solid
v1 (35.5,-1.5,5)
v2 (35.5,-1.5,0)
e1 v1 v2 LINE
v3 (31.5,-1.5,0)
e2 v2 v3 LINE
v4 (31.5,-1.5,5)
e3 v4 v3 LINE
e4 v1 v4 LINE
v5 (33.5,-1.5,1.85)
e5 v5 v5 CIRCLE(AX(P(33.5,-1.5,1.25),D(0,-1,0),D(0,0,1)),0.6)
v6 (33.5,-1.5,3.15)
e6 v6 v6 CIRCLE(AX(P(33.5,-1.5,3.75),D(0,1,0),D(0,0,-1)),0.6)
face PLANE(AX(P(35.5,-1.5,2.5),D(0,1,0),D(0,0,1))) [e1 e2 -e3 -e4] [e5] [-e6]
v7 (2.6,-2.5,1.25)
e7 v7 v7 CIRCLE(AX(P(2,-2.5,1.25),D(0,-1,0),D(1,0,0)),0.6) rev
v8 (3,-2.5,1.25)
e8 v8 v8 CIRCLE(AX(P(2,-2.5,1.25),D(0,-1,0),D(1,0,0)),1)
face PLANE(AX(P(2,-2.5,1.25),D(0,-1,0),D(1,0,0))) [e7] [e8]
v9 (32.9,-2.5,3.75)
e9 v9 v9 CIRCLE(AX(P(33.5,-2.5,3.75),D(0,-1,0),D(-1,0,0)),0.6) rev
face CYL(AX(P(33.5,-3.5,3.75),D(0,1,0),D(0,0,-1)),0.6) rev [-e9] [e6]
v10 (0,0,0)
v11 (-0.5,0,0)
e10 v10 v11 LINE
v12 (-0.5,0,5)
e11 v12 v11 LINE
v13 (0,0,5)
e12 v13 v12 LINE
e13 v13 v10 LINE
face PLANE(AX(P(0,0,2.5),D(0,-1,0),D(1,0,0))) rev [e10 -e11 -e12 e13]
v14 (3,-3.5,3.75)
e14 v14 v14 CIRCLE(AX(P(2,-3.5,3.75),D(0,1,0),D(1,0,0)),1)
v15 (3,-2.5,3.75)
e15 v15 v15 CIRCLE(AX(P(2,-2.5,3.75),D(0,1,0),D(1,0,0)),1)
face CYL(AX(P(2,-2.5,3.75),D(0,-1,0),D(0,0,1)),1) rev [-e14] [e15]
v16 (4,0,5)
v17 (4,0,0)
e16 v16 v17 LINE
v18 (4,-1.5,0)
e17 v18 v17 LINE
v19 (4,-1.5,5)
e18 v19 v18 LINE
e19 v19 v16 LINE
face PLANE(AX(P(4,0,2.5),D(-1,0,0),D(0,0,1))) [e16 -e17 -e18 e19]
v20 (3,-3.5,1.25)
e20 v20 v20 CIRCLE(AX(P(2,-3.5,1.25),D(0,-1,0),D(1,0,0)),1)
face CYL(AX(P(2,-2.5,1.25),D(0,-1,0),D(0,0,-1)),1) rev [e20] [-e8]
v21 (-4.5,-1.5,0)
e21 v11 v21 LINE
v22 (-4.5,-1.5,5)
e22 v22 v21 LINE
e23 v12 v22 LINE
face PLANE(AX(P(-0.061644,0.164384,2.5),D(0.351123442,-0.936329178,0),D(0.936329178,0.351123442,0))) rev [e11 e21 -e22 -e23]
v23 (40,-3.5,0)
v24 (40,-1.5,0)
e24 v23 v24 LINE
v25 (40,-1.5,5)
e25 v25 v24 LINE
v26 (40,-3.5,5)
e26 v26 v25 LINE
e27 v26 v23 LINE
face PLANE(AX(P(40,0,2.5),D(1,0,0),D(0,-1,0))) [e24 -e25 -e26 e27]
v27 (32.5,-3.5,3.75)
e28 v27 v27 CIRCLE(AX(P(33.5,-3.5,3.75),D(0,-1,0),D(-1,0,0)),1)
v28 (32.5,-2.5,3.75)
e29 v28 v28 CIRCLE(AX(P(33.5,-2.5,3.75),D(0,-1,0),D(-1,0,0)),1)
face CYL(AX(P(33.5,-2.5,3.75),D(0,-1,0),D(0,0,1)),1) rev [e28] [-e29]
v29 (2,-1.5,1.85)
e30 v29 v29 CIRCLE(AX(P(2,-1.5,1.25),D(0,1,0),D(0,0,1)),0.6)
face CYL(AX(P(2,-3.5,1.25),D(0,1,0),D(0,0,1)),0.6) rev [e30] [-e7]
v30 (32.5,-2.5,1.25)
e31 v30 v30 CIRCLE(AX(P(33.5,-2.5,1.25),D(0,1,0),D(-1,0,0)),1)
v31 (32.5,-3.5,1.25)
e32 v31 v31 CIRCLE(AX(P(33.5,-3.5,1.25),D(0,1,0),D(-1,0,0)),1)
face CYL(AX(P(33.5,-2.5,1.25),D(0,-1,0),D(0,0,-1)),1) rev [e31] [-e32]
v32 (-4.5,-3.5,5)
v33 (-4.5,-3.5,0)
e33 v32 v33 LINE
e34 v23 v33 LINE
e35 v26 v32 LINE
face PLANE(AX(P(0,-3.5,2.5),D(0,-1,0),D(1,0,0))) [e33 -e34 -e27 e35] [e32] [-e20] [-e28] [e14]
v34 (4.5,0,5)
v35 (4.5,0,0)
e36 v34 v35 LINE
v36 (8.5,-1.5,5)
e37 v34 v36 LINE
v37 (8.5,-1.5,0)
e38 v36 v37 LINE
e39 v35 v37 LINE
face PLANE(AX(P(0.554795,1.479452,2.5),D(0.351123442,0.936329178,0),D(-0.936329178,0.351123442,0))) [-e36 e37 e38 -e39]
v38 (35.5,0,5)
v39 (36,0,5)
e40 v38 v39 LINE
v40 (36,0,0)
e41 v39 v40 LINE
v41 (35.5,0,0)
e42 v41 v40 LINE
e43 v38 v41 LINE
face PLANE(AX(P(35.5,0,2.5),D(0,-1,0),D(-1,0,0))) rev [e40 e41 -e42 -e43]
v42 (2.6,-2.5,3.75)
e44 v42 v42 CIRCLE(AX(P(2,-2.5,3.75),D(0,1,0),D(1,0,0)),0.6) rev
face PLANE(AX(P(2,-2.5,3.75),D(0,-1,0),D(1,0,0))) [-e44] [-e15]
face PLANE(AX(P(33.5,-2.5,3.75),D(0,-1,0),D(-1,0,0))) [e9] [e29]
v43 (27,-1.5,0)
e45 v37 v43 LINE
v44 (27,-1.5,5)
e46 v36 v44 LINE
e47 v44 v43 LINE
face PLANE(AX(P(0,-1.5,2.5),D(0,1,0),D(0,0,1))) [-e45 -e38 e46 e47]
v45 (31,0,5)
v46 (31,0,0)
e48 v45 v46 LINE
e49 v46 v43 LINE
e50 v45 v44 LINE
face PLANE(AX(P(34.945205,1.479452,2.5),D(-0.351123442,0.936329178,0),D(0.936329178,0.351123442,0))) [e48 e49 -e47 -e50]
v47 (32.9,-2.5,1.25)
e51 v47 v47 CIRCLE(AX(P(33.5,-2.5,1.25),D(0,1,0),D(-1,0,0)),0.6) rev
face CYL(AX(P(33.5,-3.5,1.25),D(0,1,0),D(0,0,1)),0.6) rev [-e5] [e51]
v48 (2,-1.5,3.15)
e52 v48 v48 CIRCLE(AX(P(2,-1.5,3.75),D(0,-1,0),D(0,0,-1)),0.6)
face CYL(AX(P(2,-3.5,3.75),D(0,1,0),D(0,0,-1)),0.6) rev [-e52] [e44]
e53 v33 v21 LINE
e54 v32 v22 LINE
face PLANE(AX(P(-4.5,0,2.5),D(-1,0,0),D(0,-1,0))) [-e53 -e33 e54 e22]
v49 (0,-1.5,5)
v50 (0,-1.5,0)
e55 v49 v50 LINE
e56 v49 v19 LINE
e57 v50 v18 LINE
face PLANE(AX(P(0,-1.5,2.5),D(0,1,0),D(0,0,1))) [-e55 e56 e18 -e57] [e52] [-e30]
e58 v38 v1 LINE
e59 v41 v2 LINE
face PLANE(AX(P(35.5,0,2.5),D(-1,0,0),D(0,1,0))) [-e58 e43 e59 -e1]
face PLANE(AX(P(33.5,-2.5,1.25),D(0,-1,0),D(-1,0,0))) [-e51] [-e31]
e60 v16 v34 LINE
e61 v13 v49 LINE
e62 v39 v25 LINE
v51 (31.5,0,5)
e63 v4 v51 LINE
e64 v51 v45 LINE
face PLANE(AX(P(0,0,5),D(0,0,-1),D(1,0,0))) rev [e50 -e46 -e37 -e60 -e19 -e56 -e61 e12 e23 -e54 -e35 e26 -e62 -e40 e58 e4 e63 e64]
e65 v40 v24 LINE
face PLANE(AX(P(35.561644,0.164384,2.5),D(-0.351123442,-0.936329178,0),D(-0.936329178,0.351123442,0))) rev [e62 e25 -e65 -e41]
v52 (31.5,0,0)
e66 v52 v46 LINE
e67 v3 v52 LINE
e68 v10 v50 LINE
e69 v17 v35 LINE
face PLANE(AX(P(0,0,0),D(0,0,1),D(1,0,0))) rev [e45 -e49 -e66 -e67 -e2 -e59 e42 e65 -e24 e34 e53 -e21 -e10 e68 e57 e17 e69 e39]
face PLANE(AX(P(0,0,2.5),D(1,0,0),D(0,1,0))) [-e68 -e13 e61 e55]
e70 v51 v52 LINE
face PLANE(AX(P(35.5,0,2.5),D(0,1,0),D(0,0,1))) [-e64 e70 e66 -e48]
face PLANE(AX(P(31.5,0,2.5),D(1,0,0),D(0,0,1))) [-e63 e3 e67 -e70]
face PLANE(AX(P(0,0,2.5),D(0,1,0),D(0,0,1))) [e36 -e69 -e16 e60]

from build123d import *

# Parameters (mm, degrees)
EXTRUDE_1_DEPTH     = 2.5
SKETCH_5_R          = 0.6
CUT_EXTRUDE_1_DEPTH = 19.036421485
CUT_EXTRUDE_START   = -2
SKETCH_5_3_R        = 1
CUT_EXTRUDE_2_DEPTH = 1


with BuildPart() as part:
    # 草图4 → 凸台-拉伸1 (new body)
    with BuildSketch(Plane.XY):
        Polygon((8.5, -1.5), (17.75, -1.5), (17.75, -3.5), (-4.5, -3.5), (-4.5, -1.5), (-0.5, 0), (0, 0), (0, -1.5), (4, -1.5), (4, 0), (4.5, 0), align=None)
    extrude(amount=EXTRUDE_1_DEPTH)

    # 草图5 → 切除-拉伸1 (cut, through all)
    with BuildSketch(Plane(origin=(0, -1.5, 0), x_dir=(1, 0, 0), z_dir=(0, 1, 0))):
        with Locations(Location((2, -1.25, 0), (0, 0, 270))):
            Circle(SKETCH_5_R)
    extrude(amount=-CUT_EXTRUDE_1_DEPTH, mode=Mode.SUBTRACT)

    # 草图5<3> → 切除-拉伸2 (cut)
    with BuildSketch(Plane(origin=(0, -1.5, 0), x_dir=(1, 0, 0), z_dir=(0, 1, 0)).offset(CUT_EXTRUDE_START)):
        with Locations((2, -1.25)):
            Circle(SKETCH_5_3_R)
    extrude(amount=CUT_EXTRUDE_2_DEPTH, mode=Mode.SUBTRACT)

    # 镜向1: part across plane


with BuildPart() as part_1:
    add(part.part)
    add(part.part.mirror(Plane.XY.offset(2.5)))

    # 镜向2: part across plane


with BuildPart() as part_2:
    add(part_1.part)
    add(part_1.part.mirror(Plane(origin=(17.75, 0, 2.5), x_dir=(0, 0, 1), z_dir=(1, 0, 0))))


solid = part_2.part
